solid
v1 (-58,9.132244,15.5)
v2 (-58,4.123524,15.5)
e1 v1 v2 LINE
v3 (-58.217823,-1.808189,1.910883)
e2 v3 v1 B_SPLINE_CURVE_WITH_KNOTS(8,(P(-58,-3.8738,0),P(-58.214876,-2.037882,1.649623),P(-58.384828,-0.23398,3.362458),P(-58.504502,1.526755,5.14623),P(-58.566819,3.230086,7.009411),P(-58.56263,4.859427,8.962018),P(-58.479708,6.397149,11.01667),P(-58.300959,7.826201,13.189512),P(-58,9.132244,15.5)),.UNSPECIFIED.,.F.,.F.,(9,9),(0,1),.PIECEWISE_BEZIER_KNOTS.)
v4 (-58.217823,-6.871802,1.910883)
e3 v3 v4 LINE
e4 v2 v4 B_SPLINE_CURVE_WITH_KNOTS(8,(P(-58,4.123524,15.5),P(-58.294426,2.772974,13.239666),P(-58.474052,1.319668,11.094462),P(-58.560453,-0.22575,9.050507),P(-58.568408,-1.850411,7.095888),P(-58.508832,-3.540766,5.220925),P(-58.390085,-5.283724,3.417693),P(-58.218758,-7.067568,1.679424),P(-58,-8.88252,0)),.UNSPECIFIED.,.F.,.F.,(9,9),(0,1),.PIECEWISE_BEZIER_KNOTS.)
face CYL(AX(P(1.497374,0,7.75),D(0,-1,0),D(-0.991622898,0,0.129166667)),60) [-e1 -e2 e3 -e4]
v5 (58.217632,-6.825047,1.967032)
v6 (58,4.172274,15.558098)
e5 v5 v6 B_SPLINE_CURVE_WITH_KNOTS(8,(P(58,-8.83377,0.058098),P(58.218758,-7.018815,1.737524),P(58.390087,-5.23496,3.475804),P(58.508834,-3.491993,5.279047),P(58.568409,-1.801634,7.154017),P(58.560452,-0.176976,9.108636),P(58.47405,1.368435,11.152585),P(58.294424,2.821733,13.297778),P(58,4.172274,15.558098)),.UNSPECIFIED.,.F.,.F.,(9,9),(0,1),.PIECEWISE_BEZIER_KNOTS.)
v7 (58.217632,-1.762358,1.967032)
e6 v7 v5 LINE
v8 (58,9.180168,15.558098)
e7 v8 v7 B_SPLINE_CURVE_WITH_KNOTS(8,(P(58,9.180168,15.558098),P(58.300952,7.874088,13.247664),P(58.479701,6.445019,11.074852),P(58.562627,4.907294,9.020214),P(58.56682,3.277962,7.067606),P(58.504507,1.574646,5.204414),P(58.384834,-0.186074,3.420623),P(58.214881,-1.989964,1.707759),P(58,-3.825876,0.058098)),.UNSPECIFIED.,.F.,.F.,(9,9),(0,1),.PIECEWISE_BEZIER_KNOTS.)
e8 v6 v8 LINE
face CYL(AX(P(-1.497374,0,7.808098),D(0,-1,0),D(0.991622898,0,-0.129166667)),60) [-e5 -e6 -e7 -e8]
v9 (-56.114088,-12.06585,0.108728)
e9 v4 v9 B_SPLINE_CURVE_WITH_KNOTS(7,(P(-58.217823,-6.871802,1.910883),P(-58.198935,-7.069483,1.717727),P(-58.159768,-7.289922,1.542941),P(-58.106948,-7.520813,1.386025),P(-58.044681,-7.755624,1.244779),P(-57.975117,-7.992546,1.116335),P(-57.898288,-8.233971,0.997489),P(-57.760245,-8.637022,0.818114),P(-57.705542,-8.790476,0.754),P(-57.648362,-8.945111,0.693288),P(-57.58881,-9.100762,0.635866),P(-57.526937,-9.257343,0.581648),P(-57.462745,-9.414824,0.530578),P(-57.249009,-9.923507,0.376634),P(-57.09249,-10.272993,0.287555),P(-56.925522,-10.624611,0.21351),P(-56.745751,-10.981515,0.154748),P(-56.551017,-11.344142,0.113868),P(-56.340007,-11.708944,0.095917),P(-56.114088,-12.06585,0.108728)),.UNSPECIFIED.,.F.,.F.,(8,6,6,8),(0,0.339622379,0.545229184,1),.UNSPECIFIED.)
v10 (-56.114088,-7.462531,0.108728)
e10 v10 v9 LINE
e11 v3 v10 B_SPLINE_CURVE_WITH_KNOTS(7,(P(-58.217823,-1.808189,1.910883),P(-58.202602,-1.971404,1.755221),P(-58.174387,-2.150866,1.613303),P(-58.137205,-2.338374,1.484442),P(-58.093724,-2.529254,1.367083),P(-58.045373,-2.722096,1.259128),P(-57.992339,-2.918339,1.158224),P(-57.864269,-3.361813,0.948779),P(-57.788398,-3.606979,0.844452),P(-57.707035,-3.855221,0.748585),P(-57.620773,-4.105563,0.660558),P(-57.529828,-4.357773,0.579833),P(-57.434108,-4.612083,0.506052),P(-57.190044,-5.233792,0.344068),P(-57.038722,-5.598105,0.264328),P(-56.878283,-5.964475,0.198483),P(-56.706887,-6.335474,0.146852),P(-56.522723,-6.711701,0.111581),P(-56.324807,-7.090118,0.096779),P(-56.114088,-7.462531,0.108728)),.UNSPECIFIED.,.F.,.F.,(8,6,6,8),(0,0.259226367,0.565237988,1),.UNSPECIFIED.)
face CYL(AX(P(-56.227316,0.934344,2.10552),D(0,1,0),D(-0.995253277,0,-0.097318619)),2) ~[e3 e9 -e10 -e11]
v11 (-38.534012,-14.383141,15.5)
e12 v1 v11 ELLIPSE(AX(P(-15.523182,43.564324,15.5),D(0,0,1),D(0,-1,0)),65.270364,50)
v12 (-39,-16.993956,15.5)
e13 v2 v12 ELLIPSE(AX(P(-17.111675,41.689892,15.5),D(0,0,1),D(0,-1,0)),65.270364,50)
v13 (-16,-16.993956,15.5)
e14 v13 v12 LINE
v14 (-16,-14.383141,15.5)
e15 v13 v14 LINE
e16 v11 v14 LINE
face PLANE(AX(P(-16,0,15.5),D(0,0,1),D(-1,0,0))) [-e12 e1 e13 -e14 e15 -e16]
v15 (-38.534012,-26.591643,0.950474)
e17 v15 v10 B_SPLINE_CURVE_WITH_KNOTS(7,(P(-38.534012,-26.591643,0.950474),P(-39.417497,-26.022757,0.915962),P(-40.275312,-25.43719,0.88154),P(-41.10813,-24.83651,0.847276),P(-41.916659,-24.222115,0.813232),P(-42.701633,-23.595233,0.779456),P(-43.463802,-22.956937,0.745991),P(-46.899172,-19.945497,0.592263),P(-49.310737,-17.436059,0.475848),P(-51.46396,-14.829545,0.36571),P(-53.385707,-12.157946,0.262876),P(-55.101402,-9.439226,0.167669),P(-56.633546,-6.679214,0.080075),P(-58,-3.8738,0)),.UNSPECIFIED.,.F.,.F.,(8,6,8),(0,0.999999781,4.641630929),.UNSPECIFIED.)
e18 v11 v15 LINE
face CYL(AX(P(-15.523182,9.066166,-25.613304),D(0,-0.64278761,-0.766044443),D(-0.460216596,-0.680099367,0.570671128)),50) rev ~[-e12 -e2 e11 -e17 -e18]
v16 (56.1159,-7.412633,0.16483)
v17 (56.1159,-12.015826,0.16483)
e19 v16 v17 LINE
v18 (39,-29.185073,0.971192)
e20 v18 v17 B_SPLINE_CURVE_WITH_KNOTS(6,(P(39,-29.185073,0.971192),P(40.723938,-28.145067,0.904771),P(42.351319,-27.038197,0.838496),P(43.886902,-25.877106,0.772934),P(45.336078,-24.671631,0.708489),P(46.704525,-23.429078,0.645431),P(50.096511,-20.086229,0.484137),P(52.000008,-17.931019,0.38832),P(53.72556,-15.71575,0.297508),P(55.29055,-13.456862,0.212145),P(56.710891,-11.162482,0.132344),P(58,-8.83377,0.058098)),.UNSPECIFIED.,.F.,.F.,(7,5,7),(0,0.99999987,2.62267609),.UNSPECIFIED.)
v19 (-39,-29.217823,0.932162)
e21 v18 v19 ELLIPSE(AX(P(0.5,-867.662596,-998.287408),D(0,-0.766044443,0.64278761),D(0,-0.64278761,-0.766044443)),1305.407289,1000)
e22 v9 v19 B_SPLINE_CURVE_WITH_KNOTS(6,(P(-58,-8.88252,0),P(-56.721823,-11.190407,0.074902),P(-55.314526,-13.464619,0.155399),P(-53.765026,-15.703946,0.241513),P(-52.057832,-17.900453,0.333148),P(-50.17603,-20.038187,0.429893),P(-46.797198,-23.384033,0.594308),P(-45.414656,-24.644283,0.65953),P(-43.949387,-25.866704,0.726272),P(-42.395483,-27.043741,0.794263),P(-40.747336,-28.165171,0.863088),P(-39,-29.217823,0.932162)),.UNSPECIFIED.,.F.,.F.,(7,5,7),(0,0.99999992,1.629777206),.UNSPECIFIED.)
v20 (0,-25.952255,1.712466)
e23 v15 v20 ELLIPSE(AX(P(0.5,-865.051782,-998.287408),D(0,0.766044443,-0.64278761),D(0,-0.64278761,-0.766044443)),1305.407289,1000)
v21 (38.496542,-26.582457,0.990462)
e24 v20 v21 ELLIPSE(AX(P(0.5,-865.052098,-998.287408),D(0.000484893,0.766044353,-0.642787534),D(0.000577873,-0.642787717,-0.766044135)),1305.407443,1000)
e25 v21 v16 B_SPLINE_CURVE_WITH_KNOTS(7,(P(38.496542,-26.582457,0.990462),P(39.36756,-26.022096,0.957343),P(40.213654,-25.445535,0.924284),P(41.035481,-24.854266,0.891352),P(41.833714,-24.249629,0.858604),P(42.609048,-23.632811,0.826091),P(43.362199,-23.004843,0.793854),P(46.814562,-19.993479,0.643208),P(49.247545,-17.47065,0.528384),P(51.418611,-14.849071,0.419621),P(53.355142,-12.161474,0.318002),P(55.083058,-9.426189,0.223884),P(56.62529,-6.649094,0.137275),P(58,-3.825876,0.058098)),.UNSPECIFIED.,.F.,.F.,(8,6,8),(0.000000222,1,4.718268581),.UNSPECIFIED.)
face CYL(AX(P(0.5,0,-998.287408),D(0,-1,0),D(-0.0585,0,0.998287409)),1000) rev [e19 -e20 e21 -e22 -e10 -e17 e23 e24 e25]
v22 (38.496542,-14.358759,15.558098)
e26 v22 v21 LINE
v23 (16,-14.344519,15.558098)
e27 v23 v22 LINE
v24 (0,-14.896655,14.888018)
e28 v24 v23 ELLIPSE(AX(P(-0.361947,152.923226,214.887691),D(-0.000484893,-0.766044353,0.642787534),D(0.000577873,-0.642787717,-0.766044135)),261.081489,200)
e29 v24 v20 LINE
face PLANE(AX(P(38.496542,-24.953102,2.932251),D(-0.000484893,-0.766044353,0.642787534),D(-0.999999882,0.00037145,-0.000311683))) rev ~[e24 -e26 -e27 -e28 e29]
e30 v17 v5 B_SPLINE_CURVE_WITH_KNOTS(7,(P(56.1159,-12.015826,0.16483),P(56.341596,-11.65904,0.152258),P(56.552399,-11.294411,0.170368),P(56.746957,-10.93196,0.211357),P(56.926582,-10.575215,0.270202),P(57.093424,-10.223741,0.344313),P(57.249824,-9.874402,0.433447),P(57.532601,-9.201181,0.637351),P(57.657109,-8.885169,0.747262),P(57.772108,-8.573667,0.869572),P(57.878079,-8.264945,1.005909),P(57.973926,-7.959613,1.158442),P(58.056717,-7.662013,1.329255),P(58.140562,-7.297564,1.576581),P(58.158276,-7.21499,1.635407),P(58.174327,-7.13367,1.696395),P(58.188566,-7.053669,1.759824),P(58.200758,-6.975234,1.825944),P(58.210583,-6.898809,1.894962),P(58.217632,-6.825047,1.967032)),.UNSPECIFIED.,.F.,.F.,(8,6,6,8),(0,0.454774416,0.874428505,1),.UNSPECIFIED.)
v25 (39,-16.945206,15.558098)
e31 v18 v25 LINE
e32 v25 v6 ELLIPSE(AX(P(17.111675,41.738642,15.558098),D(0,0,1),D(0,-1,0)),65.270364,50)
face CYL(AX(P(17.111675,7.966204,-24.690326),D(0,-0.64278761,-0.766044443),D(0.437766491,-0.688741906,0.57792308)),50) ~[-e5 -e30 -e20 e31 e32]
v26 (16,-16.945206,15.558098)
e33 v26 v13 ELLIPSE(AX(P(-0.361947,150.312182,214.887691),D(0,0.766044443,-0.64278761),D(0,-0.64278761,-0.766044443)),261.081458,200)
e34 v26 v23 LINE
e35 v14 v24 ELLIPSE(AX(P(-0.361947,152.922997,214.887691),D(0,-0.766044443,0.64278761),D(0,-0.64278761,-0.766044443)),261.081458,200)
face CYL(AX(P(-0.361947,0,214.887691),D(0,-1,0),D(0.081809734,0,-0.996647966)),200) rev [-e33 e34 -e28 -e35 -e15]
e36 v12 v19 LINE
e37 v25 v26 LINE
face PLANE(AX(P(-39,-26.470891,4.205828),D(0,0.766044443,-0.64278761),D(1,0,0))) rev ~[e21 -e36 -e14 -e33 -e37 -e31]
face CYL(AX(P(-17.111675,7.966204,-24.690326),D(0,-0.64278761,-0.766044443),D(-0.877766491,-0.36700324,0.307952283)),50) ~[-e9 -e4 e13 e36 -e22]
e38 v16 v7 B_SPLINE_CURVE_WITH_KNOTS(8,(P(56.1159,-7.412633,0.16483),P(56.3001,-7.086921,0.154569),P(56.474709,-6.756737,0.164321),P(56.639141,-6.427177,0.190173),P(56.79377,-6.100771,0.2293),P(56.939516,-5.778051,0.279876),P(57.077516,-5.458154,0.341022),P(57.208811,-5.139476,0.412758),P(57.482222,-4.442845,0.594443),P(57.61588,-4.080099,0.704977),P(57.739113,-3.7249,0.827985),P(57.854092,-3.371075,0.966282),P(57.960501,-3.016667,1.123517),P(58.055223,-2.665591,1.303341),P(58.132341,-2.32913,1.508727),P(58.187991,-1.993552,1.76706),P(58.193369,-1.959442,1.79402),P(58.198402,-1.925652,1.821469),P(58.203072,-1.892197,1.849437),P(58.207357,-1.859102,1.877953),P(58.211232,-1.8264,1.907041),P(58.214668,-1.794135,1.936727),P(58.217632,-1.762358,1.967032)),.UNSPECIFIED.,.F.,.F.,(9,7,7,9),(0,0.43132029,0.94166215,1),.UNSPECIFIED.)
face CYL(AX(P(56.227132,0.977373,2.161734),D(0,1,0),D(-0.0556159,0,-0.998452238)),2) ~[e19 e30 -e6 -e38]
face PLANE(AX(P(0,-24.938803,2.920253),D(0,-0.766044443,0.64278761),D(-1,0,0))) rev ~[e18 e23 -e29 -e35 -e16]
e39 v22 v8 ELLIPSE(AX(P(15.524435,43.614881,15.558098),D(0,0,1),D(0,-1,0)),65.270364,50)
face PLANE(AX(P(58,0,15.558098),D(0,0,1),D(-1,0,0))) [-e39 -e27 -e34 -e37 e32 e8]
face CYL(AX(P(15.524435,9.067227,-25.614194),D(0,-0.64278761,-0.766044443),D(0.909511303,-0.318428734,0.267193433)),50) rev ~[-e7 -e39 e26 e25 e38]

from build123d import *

# Parameters (mm, degrees)
F1_DEPTH      = 40
F1_DEPTH_BACK = 11
F4_DEPTH      = 35
F4_DEPTH_BACK = 27.9057510197
F5_T1_DEPTH   = 14.6143927182
F5_T3_DEPTH   = 14.6250082056


# Not quite as in the source:
# - a fillet or chamfer that OpenCascade refuses, or shapes differently, is made with other operations: its cross-section is extruded or revolved along the edge and cut away or added


with BuildPart() as f1:
    # F0 (on Front) → F1 (new body, two sides)
    with BuildSketch(Plane.XZ) as f1_sk:
        with BuildLine():
            Line((-16, 15.5), (-58, 15.5))
            ThreePointArc((-58, 15.5), (-58.5026261084, 7.75), (-58, 0))
            ThreePointArc((-58, 0), (-0.000843128, 1.7124660629), (58, 0.0580978101))
            ThreePointArc((58, 0.0580978101), (58.5026261084, 7.8080978101), (58, 15.5580978101))
            Line((58, 15.5580978101), (16, 15.5580978101))
            ThreePointArc((16, 15.5580978101), (0.0011638232, 14.8880205552), (-16, 15.5))
        make_face()
    extrude(amount=F1_DEPTH)
    extrude(f1_sk.sketch, amount=-F1_DEPTH_BACK)

    # F3 (on face) → F4 (cut, two sides)
    with BuildSketch(Plane(origin=(0, -8.8661687739, -10.5662884888), x_dir=(1, 0, 0), z_dir=(0, -0.6427876097, -0.7660444431))) as f4_sk:
        with BuildLine():
            Line((38.4965417924, 21), (0, 20.9813332936))
            Line((0, 20.9813332936), (-38.534011751, 20.9813332936))
            ThreePointArc((-38.534011751, 20.9813332936), (-51.7445439017, 11.0585633209), (-61, -2.6277822851))
            Line((-61, -2.6277822851), (-61, -10.626510717))
            Line((-61, -10.626510717), (-61, -28.2158330083))
            Line((-61, -28.2158330083), (0, -28.2158330083))
            Line((0, -28.2158330083), (61, -28.2158330083))
            Line((61, -28.2158330083), (61, -12.4673116952))
            Line((61, -12.4673116952), (61, -2.6264255467))
            ThreePointArc((61, -2.6264255467), (51.7297238243, 11.0740614176), (38.4965417924, 21))
        make_face()
        with BuildLine():
            Line((61, 1.9813332936), (61, 22.9813332936))
            Line((61, 22.9813332936), (61, 52.9813332936))
            Line((61, 52.9813332936), (-61, 52.9813332936))
            Line((-61, 52.9813332936), (-61, 22.9813332936))
            Line((-61, 22.9813332936), (-61, 1.9813332936))
            ThreePointArc((-61, 1.9813332936), (-51.6354627813, 14.1946752549), (-39, 22.9813332936))
            Line((-39, 22.9813332936), (39, 22.9813332936))
            ThreePointArc((39, 22.9813332936), (51.6354627813, 14.1946752549), (61, 1.9813332936))
        make_face()
    extrude(amount=-F4_DEPTH, mode=Mode.SUBTRACT)
    extrude(f4_sk.sketch, amount=F4_DEPTH_BACK, mode=Mode.SUBTRACT)

    # F5: fillet of radius 2 on 2 edges, made by hand

    # F5_s2 → F5_t1 (cut)
    with BuildSketch(Plane.XZ.offset(-0.9773730981)):
        with BuildLine():
            ThreePointArc((56.1159001591, 0.164829526), (57.5290135561, 0.6434770054), (58.2176321612, 1.9670318018))
            ThreePointArc((58.2176321612, 1.9670318018), (58.1164574753, 1.0116936322), (58, 0.0580978101))
            ThreePointArc((58, 0.0580978101), (57.0579752565, 0.1119081086), (56.1159001591, 0.164829526))
        make_face()
    extrude(amount=F5_T1_DEPTH, mode=Mode.SUBTRACT)

    # F5_s4 → F5_t3 (cut)
    with BuildSketch(Plane.XZ.offset(-0.9343439765)):
        with BuildLine():
            ThreePointArc((-58.2178227579, 1.9108828482), (-57.5284634735, 0.5866337247), (-56.1140880268, 0.1087278139))
            ThreePointArc((-56.1140880268, 0.1087278139), (-57.0570696874, 0.0548092283), (-58, 0))
            ThreePointArc((-58, 0), (-58.1165683708, 0.9545685987), (-58.2178227579, 1.9108828482))
        make_face()
    extrude(amount=F5_T3_DEPTH, mode=Mode.SUBTRACT)


solid = f1.part
